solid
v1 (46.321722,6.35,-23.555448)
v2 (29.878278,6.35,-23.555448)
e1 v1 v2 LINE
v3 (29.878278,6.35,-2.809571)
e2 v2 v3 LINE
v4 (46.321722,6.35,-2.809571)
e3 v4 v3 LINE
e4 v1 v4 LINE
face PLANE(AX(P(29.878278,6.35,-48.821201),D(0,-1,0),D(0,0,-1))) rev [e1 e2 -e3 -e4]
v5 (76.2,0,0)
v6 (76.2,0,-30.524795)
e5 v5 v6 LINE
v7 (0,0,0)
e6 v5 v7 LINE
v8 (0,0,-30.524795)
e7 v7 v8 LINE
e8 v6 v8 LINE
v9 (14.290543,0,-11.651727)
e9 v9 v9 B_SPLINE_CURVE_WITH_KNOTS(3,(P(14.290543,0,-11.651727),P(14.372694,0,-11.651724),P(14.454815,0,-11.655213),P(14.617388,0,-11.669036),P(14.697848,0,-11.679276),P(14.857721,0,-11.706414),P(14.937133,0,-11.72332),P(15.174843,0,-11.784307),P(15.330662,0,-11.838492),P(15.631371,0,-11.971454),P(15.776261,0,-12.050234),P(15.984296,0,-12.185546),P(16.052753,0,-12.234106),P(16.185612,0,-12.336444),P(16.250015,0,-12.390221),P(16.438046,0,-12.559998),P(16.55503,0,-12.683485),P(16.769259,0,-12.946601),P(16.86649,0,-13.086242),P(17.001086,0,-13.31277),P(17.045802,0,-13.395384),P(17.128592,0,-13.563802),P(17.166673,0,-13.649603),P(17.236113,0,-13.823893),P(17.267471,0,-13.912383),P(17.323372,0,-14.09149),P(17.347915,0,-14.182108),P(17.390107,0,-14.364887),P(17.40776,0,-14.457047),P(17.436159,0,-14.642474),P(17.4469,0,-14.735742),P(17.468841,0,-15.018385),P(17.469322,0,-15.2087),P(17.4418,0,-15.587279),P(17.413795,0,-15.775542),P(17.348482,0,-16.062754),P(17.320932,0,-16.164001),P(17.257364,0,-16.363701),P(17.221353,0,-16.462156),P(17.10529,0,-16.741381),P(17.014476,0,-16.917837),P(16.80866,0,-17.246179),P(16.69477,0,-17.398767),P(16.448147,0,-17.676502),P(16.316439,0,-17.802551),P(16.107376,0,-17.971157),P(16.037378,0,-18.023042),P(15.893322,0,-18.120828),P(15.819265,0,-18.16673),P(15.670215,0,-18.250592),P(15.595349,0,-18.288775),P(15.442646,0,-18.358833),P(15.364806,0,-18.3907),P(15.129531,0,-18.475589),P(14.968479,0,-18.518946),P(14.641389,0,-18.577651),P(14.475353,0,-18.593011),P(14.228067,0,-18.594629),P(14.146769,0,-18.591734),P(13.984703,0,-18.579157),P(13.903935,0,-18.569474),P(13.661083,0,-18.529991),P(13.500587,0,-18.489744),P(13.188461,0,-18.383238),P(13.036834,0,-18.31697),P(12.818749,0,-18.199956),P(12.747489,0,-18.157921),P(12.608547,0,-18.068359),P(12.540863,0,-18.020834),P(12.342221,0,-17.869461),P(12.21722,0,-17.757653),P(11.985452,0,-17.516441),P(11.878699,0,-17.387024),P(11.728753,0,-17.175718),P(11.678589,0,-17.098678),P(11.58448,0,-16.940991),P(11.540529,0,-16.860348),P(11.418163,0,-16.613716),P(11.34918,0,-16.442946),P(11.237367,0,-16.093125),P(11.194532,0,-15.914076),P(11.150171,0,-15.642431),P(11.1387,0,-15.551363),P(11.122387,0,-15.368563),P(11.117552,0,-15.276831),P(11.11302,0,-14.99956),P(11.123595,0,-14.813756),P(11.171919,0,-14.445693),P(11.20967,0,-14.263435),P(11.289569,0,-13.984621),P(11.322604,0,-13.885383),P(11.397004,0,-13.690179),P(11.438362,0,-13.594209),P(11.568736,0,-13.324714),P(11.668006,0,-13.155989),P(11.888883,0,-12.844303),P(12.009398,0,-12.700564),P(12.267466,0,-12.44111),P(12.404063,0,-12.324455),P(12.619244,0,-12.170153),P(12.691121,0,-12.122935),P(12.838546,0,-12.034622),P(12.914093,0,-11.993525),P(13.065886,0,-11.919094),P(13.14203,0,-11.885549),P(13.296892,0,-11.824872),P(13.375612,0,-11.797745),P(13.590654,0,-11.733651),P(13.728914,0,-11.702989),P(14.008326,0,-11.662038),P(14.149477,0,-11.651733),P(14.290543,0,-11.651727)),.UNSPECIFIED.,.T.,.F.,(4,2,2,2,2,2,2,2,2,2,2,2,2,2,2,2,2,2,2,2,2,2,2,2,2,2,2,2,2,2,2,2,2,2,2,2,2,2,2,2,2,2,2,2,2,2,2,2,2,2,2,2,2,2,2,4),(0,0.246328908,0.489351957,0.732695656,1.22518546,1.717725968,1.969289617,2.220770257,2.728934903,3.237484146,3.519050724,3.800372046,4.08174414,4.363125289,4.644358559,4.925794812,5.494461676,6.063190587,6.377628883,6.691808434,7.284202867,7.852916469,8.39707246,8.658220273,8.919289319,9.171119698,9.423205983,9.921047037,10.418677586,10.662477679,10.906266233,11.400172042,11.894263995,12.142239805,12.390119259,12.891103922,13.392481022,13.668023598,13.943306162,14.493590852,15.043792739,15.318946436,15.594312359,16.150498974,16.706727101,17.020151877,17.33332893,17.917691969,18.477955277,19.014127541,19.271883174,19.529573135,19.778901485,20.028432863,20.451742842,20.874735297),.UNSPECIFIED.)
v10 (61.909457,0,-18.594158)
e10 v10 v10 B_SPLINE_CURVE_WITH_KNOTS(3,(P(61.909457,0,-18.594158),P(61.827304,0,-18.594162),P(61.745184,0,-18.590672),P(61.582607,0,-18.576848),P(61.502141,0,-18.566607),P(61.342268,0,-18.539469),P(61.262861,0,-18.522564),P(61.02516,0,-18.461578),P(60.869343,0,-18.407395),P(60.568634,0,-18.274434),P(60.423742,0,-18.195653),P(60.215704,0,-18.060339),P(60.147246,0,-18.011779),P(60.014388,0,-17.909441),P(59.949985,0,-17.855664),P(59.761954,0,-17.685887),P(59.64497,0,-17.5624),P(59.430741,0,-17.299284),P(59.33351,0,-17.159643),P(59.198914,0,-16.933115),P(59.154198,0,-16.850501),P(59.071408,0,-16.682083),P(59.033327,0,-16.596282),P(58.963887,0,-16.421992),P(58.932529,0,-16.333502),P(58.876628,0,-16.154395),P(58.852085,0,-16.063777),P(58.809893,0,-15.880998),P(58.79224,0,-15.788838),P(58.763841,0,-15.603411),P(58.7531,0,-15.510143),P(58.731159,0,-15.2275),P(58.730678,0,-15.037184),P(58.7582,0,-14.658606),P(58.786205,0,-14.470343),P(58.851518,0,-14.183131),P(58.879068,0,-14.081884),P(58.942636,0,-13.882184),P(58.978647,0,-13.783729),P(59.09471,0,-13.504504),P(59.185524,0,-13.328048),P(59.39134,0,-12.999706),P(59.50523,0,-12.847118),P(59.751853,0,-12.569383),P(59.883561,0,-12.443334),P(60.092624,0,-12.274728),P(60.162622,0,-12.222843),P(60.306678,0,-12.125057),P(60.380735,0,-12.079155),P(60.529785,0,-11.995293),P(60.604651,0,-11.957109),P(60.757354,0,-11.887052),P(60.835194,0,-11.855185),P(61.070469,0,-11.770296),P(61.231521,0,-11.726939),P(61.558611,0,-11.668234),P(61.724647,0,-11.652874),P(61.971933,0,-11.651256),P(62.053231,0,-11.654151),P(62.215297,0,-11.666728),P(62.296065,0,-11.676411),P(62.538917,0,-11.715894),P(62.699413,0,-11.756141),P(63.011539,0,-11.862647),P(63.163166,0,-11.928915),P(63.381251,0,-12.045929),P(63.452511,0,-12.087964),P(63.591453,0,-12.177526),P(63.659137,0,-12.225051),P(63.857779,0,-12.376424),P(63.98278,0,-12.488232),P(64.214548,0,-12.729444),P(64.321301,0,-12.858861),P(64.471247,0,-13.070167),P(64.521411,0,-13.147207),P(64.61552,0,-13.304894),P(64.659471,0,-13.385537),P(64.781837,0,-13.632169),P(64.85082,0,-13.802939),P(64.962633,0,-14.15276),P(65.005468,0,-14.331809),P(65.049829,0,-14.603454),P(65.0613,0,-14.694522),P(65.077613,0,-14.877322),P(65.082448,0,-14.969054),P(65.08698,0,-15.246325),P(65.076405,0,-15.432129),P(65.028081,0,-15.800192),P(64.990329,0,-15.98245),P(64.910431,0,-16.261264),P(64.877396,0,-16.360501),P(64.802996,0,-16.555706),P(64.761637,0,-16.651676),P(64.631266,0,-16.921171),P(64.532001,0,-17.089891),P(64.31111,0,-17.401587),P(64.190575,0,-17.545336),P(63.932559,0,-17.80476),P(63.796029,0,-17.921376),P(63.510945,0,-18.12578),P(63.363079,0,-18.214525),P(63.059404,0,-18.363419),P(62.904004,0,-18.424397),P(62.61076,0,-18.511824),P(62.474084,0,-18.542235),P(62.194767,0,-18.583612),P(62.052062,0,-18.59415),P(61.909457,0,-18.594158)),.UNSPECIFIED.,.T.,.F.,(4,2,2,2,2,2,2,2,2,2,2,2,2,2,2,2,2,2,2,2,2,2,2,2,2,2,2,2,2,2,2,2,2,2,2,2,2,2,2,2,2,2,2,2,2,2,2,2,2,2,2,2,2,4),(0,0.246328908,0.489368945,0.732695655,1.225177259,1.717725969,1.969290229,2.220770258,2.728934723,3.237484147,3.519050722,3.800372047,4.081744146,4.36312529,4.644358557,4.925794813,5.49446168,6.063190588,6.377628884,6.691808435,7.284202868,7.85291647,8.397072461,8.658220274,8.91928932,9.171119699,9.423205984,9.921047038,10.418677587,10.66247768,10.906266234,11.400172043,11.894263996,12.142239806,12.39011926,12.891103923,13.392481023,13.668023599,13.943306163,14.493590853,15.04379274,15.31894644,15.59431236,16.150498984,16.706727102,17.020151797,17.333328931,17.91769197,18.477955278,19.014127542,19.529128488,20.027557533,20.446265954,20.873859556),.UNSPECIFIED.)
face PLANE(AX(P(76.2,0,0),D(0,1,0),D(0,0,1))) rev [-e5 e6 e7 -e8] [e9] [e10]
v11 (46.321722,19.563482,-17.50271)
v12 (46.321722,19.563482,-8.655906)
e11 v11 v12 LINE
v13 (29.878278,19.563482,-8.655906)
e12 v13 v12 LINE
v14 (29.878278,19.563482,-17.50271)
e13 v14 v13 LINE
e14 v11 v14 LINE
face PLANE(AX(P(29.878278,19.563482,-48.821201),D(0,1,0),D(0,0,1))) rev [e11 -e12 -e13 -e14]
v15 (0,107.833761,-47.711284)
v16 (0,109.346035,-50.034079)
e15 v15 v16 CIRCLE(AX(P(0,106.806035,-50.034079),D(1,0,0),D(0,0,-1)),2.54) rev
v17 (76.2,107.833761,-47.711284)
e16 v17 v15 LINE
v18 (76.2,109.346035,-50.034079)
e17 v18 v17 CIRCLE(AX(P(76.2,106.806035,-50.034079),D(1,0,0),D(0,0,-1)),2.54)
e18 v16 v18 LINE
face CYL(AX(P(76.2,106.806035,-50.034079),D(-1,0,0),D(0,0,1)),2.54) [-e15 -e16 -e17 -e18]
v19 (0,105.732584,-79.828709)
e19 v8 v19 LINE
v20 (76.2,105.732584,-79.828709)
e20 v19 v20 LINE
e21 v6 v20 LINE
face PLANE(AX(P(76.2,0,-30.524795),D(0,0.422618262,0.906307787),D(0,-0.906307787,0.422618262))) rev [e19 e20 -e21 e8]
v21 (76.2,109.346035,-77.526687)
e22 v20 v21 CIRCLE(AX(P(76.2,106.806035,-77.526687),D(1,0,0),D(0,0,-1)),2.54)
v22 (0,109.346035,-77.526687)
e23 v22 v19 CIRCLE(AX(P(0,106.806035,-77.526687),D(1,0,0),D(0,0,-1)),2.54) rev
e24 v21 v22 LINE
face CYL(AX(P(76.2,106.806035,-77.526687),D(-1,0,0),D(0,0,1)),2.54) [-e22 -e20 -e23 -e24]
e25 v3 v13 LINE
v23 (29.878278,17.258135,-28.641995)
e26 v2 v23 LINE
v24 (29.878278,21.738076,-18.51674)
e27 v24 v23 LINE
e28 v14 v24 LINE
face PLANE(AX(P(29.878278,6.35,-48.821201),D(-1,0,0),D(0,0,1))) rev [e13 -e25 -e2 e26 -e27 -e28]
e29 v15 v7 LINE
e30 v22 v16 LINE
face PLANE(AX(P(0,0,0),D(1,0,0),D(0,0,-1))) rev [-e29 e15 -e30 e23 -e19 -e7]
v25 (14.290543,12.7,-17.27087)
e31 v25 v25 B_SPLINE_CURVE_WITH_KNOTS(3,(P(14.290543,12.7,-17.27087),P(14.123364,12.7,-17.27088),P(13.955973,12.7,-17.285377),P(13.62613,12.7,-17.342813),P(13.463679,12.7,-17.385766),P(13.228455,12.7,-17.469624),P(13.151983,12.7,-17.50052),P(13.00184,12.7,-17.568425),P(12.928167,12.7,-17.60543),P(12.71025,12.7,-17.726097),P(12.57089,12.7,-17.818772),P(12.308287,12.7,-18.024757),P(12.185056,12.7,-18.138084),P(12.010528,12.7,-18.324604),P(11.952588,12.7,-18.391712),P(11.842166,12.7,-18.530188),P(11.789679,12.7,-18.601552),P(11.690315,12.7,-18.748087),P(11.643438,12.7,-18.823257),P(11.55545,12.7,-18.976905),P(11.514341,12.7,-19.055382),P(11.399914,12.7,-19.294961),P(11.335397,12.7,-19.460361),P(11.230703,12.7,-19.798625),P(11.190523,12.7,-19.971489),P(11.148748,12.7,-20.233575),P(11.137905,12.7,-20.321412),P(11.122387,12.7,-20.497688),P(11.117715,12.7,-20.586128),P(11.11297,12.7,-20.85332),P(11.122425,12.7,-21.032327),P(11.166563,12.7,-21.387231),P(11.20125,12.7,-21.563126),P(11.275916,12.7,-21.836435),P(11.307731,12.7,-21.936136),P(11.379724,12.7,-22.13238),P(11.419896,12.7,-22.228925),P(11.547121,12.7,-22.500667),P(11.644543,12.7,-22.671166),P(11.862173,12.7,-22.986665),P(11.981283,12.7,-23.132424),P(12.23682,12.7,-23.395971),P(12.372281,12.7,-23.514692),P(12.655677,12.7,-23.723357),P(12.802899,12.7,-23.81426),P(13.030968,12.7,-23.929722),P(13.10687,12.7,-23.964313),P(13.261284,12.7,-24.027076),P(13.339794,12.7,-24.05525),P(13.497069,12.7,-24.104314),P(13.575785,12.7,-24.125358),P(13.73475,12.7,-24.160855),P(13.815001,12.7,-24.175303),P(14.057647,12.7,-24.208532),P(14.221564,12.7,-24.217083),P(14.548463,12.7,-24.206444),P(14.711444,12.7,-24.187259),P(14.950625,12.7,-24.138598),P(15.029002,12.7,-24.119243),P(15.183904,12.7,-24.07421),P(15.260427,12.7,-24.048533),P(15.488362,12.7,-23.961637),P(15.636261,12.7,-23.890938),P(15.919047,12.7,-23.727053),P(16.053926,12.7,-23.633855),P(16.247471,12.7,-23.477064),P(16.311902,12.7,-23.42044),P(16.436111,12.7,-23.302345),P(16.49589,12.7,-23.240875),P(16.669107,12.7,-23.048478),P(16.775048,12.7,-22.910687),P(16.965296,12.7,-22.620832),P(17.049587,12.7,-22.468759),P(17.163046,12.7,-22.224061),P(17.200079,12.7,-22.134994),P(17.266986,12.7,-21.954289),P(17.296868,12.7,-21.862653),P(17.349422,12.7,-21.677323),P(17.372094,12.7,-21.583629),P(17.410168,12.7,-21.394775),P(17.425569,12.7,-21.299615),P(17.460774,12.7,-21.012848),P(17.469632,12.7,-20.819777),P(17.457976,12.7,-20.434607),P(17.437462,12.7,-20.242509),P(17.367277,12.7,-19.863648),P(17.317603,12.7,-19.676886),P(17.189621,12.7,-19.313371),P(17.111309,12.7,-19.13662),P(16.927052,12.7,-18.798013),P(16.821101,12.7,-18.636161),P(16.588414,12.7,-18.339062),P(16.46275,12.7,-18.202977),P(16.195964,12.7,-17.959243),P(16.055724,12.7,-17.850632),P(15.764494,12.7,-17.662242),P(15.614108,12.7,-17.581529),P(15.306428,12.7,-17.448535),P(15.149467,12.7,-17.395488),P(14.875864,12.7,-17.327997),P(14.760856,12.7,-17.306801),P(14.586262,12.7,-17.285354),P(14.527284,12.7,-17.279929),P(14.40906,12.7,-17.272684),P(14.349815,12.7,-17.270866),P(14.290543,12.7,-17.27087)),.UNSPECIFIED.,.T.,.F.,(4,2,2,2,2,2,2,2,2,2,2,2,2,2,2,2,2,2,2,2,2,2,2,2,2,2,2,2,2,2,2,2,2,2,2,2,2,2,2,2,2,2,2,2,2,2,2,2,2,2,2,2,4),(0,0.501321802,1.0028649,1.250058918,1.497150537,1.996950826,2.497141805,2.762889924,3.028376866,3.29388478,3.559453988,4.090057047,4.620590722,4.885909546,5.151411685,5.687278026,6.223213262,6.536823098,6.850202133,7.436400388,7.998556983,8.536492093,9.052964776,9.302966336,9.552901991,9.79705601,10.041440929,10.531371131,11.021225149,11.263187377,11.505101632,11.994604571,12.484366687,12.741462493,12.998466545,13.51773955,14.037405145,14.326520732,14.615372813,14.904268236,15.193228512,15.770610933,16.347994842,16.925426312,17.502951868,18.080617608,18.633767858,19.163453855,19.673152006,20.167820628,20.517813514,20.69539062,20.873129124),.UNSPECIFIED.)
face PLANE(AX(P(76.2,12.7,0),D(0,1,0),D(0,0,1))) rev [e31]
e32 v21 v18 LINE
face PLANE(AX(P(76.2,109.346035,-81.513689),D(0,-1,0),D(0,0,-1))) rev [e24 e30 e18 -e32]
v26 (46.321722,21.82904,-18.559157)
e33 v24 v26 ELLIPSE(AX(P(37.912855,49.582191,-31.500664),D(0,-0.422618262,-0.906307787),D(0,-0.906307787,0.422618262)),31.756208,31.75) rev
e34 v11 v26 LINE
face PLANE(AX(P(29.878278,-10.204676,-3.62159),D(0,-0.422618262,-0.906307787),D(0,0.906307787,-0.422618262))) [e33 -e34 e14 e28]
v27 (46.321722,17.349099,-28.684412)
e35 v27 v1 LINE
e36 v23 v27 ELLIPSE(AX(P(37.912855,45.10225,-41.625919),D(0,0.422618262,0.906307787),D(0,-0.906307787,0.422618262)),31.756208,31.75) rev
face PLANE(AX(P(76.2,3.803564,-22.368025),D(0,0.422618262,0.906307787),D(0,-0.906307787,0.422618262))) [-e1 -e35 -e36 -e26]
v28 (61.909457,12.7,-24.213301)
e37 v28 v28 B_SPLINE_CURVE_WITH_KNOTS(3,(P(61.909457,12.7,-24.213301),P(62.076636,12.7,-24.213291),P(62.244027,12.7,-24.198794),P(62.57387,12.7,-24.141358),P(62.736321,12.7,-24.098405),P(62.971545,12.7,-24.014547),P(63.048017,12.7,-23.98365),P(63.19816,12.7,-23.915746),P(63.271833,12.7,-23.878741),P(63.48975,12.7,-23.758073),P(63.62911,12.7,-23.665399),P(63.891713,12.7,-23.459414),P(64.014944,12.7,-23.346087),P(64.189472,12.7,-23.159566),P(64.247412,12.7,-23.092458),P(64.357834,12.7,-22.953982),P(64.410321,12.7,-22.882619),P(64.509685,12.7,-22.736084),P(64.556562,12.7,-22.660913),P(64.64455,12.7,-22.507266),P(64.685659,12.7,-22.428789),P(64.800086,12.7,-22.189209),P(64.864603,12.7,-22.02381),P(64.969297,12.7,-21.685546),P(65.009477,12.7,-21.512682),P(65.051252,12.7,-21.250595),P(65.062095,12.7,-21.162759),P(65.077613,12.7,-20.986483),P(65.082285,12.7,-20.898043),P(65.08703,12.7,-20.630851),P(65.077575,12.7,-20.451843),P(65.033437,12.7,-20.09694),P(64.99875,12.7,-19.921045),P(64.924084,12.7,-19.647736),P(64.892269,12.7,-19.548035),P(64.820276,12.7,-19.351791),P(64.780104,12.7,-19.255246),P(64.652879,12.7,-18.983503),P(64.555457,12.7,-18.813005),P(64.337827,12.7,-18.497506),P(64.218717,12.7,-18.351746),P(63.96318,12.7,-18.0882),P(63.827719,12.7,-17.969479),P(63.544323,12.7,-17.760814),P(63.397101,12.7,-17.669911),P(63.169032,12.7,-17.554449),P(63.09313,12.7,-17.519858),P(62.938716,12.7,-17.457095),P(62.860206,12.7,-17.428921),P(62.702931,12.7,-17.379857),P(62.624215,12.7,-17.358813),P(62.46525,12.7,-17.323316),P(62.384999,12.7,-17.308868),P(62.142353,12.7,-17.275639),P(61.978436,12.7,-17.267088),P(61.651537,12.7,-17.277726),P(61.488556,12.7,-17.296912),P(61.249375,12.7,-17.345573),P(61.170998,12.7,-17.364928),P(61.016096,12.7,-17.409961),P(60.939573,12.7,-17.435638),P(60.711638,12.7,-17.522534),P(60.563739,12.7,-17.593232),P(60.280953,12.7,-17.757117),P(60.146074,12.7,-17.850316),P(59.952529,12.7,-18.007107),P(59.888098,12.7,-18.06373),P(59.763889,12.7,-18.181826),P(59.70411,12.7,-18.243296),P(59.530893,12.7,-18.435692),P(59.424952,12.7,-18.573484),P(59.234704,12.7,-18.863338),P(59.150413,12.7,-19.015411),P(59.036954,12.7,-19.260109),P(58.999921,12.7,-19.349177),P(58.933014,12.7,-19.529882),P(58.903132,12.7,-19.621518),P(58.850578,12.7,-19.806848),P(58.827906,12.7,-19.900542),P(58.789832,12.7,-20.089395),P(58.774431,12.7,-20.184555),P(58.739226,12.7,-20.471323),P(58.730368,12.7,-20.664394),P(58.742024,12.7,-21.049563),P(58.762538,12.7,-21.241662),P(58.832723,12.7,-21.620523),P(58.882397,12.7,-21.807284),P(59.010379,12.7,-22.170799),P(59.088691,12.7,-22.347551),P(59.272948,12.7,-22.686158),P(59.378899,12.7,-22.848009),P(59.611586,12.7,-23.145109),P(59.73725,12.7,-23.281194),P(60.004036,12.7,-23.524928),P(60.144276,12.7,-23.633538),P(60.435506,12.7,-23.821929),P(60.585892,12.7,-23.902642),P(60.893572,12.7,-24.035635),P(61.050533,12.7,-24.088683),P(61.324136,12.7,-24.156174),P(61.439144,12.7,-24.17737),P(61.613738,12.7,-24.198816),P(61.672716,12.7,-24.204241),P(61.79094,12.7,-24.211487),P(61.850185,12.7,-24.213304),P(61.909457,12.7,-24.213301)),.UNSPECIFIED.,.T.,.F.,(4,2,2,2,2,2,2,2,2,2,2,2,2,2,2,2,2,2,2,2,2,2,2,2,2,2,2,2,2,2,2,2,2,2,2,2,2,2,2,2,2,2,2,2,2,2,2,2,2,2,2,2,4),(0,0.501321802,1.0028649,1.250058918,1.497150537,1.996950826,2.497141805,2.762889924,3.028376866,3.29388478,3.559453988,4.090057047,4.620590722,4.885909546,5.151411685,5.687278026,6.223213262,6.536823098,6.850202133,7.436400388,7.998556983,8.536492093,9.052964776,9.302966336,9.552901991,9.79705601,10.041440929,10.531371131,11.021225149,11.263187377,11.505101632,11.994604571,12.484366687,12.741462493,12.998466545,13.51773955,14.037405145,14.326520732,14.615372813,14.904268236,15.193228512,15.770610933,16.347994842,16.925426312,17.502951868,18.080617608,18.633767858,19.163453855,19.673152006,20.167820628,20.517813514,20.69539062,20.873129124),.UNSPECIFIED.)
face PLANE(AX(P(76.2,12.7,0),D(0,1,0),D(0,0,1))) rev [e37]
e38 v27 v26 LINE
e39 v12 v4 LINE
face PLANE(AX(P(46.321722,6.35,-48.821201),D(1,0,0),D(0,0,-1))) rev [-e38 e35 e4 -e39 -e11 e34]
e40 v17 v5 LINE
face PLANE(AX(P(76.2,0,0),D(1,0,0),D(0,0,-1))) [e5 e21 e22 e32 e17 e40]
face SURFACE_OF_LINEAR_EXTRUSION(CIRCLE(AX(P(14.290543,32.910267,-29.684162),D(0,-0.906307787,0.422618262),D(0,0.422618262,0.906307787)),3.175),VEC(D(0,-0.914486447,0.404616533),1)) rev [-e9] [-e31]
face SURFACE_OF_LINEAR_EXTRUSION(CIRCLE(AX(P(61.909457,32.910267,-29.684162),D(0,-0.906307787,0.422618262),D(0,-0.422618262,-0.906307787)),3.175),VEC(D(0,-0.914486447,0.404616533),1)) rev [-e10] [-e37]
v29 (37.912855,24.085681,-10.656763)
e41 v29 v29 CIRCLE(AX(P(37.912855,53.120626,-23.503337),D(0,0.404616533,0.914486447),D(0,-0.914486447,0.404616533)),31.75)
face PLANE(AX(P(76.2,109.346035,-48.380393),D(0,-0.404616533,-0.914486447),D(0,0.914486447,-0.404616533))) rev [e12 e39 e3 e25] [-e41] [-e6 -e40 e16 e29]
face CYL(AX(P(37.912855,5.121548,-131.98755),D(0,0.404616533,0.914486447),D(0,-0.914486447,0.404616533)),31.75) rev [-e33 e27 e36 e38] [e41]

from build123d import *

# Parameters (mm, degrees)
BOSS_EXTRUDE1_DEPTH      = 76.2
FILLET1_R                = 2.54
CUT_EXTRUDE1_REACH       = 157.479
SKETCH2_R                = 31.75
CUT_EXTRUDE6_START       = 4
CUT_EXTRUDE6_DEPTH       = 14.602057312
CUT_EXTRUDE6_START_2     = 18.602057312
CUT_EXTRUDE6_2_DEPTH     = 2.80902025
CUT_EXTRUDE6_START_3     = 12.7
CUT_EXTRUDE6_3_OUTLINE_W = 57
CUT_EXTRUDE6_3_OUTLINE_H = 10
CUT_EXTRUDE6_3_DEPTH     = 2.568810953
CUT_EXTRUDE7_REACH       = 157.479
SKETCH12_W               = 16.443444888
SKETCH12_H               = 13.2134825
CUT_EXTRUDE9_REACH       = 134.385
SKETCH13_W               = 16.443444888
SKETCH13_H               = 11.069902364


with BuildPart() as part:
    # Sketch1 → Boss-Extrude1 (new body)
    with BuildSketch(Plane(origin=(0, 0, 0), x_dir=(0, 0, -1), z_dir=(1, 0, 0))):
        Polygon((0, 0), (30.524795297, 0), (81.513688576, 109.346034506), (48.380392686, 109.346034506), align=None)
    extrude(amount=BOSS_EXTRUDE1_DEPTH)

    # Fillet1
    fillet1_edges = [part.edges().sort_by_distance(p)[0] for p in [
        (38.1, 109.346034506, -48.380392686),
        (38.1, 109.346034506, -81.513688576),
    ]]
    fillet(fillet1_edges, radius=FILLET1_R)

    # Cut-Extrude1: up to this plane
    cut_extrude1_end = Plane(origin=(76.2, 3.803564356, -22.368025214), z_dir=(0, 0.4226182617406973, 0.906307787036651))
    # Sketch2 → Cut-Extrude1 (cut, up to the surface)
    with BuildSketch(Plane(origin=(0, 0, 0), x_dir=(1, 0, 0), z_dir=(0, 0.4046165331441324, 0.9144864466499344)), mode=Mode.PRIVATE) as cut_extrude1_sk1:
        with Locations(Location((37.912855144, 58.087931451, 0), (0, 0, 270))):
            Circle(SKETCH2_R)
    cut_extrude1_tool1 = split(extrude(cut_extrude1_sk1.sketch, amount=-CUT_EXTRUDE1_REACH, mode=Mode.PRIVATE), bisect_by=cut_extrude1_end, keep=Keep.BOTH, mode=Mode.PRIVATE)
    add(cut_extrude1_tool1.solids().sort_by_distance((37.912855, 53.120626, -23.503337))[0], mode=Mode.SUBTRACT)

    # Cut-Extrude6: read off the stored shape, not the designer's step
    # Cut-Extrude6 outline → Cut-Extrude6 (cut)
    with BuildSketch(Plane(origin=(0, 0, 0), x_dir=(1, 0, 0), z_dir=(0, 0.9144864466499345, -0.4046165331441322)).offset(CUT_EXTRUDE6_START)):
        with BuildLine():
            add(Edge.make_bspline(
                [(14.29054348, 10.655346562), (8.791282166, 10.655346562), (11.540912823, 15.416915606), (14.29054348, 20.17848465), (17.040174137, 15.416915606), (19.789804794, 10.655346562), (14.29054348, 10.655346562)],
                knots=[0, 0, 0, 2.094395102, 2.094395102, 4.188790205, 4.188790205, 6.283185307, 6.283185307, 6.283185307], degree=2, weights=[1, 0.5, 1, 0.5, 1, 0.5, 1]))
        make_face()
        with BuildLine():
            add(Edge.make_bspline(
                [(61.90945652, 17.004105287), (67.408717834, 17.004105287), (64.659087177, 12.242536243), (61.90945652, 7.4809672), (59.159825863, 12.242536243), (56.410195206, 17.004105287), (61.90945652, 17.004105287)],
                knots=[0, 0, 0, 2.094395102, 2.094395102, 4.188790205, 4.188790205, 6.283185307, 6.283185307, 6.283185307], degree=2, weights=[1, 0.5, 1, 0.5, 1, 0.5, 1]))
        make_face()
    extrude(amount=CUT_EXTRUDE6_DEPTH, mode=Mode.SUBTRACT)

    # Cut-Extrude6 2 outline → Cut-Extrude6 2 (cut)
    with BuildSketch(Plane(origin=(0, 0, 0), x_dir=(1, 0, 0), z_dir=(0, 0.9144864466499345, -0.4046165331441322)).offset(CUT_EXTRUDE6_START_2)):
        with BuildLine():
            add(Edge.make_bspline(
                [(14.29054348, 10.655346562), (8.791282166, 10.655346562), (11.540912823, 15.416915606), (14.29054348, 20.17848465), (17.040174137, 15.416915606), (19.789804794, 10.655346562), (14.29054348, 10.655346562)],
                knots=[0, 0, 0, 2.094395102, 2.094395102, 4.188790205, 4.188790205, 6.283185307, 6.283185307, 6.283185307], degree=2, weights=[1, 0.5, 1, 0.5, 1, 0.5, 1]))
        make_face()
        with BuildLine():
            add(Edge.make_bspline(
                [(61.90945652, 17.004105287), (67.408717834, 17.004105287), (64.659087177, 12.242536243), (61.90945652, 7.4809672), (59.159825863, 12.242536243), (56.410195206, 17.004105287), (61.90945652, 17.004105287)],
                knots=[0, 0, 0, 2.094395102, 2.094395102, 4.188790205, 4.188790205, 6.283185307, 6.283185307, 6.283185307], degree=2, weights=[1, 0.5, 1, 0.5, 1, 0.5, 1]))
        make_face()
    extrude(amount=CUT_EXTRUDE6_2_DEPTH, mode=Mode.SUBTRACT)

    # Cut-Extrude6 3 outline → Cut-Extrude6 3 (add)
    with BuildSketch(Plane(origin=(0, 0, 0), x_dir=(1, 0, 0), z_dir=(0, 1, 0)).offset(CUT_EXTRUDE6_START_3)):
        with Locations((38.5, 21)):
            Rectangle(CUT_EXTRUDE6_3_OUTLINE_W, CUT_EXTRUDE6_3_OUTLINE_H)
    extrude(amount=CUT_EXTRUDE6_3_DEPTH)

    # Cut-Extrude7: up to this plane
    cut_extrude7_end = Plane(origin=(76.2, 3.803564356, -22.368025214), z_dir=(0, 0.4226182617406973, 0.906307787036651))
    # Sketch12 → Cut-Extrude7 (cut, up to the surface)
    with BuildSketch(Plane.XY, mode=Mode.PRIVATE) as cut_extrude7_sk1:
        with Locations((38.1, 12.95674125)):
            Rectangle(SKETCH12_W, SKETCH12_H)
    cut_extrude7_tool1 = split(extrude(cut_extrude7_sk1.sketch, amount=-CUT_EXTRUDE7_REACH, mode=Mode.PRIVATE), bisect_by=cut_extrude7_end, keep=Keep.BOTH, mode=Mode.PRIVATE)
    add(cut_extrude7_tool1.solids().sort_by_distance((38.1, 12.956741, 0))[0], mode=Mode.SUBTRACT)

    # Cut-Extrude9: up to this face of the body (flat: up to its plane)
    cut_extrude9_end = Plane(part.part.faces().sort_by_distance((38.1, 6.35, -13.182509538))[0])
    # Sketch13 → Cut-Extrude9 (cut, up to the picked face)
    with BuildSketch(Plane(origin=(0, 25.32223957, -11.807954233), x_dir=(-1, 0, 0), z_dir=(0, -0.9063077870366496, 0.4226182617407003)), mode=Mode.PRIVATE) as cut_extrude9_sk1:
        with Locations((-38.1, 13.129908493)):
            Rectangle(SKETCH13_W, SKETCH13_H)
    cut_extrude9_tool1 = split(extrude(cut_extrude9_sk1.sketch, amount=CUT_EXTRUDE9_REACH, mode=Mode.PRIVATE), bisect_by=cut_extrude9_end, keep=Keep.BOTH, mode=Mode.PRIVATE)
    add(cut_extrude9_tool1.solids().sort_by(Axis((38.1, 19.7733, -23.707693), (0, -0.9063077870366496, 0.4226182617407003)))[0], mode=Mode.SUBTRACT)


solid = part.part
